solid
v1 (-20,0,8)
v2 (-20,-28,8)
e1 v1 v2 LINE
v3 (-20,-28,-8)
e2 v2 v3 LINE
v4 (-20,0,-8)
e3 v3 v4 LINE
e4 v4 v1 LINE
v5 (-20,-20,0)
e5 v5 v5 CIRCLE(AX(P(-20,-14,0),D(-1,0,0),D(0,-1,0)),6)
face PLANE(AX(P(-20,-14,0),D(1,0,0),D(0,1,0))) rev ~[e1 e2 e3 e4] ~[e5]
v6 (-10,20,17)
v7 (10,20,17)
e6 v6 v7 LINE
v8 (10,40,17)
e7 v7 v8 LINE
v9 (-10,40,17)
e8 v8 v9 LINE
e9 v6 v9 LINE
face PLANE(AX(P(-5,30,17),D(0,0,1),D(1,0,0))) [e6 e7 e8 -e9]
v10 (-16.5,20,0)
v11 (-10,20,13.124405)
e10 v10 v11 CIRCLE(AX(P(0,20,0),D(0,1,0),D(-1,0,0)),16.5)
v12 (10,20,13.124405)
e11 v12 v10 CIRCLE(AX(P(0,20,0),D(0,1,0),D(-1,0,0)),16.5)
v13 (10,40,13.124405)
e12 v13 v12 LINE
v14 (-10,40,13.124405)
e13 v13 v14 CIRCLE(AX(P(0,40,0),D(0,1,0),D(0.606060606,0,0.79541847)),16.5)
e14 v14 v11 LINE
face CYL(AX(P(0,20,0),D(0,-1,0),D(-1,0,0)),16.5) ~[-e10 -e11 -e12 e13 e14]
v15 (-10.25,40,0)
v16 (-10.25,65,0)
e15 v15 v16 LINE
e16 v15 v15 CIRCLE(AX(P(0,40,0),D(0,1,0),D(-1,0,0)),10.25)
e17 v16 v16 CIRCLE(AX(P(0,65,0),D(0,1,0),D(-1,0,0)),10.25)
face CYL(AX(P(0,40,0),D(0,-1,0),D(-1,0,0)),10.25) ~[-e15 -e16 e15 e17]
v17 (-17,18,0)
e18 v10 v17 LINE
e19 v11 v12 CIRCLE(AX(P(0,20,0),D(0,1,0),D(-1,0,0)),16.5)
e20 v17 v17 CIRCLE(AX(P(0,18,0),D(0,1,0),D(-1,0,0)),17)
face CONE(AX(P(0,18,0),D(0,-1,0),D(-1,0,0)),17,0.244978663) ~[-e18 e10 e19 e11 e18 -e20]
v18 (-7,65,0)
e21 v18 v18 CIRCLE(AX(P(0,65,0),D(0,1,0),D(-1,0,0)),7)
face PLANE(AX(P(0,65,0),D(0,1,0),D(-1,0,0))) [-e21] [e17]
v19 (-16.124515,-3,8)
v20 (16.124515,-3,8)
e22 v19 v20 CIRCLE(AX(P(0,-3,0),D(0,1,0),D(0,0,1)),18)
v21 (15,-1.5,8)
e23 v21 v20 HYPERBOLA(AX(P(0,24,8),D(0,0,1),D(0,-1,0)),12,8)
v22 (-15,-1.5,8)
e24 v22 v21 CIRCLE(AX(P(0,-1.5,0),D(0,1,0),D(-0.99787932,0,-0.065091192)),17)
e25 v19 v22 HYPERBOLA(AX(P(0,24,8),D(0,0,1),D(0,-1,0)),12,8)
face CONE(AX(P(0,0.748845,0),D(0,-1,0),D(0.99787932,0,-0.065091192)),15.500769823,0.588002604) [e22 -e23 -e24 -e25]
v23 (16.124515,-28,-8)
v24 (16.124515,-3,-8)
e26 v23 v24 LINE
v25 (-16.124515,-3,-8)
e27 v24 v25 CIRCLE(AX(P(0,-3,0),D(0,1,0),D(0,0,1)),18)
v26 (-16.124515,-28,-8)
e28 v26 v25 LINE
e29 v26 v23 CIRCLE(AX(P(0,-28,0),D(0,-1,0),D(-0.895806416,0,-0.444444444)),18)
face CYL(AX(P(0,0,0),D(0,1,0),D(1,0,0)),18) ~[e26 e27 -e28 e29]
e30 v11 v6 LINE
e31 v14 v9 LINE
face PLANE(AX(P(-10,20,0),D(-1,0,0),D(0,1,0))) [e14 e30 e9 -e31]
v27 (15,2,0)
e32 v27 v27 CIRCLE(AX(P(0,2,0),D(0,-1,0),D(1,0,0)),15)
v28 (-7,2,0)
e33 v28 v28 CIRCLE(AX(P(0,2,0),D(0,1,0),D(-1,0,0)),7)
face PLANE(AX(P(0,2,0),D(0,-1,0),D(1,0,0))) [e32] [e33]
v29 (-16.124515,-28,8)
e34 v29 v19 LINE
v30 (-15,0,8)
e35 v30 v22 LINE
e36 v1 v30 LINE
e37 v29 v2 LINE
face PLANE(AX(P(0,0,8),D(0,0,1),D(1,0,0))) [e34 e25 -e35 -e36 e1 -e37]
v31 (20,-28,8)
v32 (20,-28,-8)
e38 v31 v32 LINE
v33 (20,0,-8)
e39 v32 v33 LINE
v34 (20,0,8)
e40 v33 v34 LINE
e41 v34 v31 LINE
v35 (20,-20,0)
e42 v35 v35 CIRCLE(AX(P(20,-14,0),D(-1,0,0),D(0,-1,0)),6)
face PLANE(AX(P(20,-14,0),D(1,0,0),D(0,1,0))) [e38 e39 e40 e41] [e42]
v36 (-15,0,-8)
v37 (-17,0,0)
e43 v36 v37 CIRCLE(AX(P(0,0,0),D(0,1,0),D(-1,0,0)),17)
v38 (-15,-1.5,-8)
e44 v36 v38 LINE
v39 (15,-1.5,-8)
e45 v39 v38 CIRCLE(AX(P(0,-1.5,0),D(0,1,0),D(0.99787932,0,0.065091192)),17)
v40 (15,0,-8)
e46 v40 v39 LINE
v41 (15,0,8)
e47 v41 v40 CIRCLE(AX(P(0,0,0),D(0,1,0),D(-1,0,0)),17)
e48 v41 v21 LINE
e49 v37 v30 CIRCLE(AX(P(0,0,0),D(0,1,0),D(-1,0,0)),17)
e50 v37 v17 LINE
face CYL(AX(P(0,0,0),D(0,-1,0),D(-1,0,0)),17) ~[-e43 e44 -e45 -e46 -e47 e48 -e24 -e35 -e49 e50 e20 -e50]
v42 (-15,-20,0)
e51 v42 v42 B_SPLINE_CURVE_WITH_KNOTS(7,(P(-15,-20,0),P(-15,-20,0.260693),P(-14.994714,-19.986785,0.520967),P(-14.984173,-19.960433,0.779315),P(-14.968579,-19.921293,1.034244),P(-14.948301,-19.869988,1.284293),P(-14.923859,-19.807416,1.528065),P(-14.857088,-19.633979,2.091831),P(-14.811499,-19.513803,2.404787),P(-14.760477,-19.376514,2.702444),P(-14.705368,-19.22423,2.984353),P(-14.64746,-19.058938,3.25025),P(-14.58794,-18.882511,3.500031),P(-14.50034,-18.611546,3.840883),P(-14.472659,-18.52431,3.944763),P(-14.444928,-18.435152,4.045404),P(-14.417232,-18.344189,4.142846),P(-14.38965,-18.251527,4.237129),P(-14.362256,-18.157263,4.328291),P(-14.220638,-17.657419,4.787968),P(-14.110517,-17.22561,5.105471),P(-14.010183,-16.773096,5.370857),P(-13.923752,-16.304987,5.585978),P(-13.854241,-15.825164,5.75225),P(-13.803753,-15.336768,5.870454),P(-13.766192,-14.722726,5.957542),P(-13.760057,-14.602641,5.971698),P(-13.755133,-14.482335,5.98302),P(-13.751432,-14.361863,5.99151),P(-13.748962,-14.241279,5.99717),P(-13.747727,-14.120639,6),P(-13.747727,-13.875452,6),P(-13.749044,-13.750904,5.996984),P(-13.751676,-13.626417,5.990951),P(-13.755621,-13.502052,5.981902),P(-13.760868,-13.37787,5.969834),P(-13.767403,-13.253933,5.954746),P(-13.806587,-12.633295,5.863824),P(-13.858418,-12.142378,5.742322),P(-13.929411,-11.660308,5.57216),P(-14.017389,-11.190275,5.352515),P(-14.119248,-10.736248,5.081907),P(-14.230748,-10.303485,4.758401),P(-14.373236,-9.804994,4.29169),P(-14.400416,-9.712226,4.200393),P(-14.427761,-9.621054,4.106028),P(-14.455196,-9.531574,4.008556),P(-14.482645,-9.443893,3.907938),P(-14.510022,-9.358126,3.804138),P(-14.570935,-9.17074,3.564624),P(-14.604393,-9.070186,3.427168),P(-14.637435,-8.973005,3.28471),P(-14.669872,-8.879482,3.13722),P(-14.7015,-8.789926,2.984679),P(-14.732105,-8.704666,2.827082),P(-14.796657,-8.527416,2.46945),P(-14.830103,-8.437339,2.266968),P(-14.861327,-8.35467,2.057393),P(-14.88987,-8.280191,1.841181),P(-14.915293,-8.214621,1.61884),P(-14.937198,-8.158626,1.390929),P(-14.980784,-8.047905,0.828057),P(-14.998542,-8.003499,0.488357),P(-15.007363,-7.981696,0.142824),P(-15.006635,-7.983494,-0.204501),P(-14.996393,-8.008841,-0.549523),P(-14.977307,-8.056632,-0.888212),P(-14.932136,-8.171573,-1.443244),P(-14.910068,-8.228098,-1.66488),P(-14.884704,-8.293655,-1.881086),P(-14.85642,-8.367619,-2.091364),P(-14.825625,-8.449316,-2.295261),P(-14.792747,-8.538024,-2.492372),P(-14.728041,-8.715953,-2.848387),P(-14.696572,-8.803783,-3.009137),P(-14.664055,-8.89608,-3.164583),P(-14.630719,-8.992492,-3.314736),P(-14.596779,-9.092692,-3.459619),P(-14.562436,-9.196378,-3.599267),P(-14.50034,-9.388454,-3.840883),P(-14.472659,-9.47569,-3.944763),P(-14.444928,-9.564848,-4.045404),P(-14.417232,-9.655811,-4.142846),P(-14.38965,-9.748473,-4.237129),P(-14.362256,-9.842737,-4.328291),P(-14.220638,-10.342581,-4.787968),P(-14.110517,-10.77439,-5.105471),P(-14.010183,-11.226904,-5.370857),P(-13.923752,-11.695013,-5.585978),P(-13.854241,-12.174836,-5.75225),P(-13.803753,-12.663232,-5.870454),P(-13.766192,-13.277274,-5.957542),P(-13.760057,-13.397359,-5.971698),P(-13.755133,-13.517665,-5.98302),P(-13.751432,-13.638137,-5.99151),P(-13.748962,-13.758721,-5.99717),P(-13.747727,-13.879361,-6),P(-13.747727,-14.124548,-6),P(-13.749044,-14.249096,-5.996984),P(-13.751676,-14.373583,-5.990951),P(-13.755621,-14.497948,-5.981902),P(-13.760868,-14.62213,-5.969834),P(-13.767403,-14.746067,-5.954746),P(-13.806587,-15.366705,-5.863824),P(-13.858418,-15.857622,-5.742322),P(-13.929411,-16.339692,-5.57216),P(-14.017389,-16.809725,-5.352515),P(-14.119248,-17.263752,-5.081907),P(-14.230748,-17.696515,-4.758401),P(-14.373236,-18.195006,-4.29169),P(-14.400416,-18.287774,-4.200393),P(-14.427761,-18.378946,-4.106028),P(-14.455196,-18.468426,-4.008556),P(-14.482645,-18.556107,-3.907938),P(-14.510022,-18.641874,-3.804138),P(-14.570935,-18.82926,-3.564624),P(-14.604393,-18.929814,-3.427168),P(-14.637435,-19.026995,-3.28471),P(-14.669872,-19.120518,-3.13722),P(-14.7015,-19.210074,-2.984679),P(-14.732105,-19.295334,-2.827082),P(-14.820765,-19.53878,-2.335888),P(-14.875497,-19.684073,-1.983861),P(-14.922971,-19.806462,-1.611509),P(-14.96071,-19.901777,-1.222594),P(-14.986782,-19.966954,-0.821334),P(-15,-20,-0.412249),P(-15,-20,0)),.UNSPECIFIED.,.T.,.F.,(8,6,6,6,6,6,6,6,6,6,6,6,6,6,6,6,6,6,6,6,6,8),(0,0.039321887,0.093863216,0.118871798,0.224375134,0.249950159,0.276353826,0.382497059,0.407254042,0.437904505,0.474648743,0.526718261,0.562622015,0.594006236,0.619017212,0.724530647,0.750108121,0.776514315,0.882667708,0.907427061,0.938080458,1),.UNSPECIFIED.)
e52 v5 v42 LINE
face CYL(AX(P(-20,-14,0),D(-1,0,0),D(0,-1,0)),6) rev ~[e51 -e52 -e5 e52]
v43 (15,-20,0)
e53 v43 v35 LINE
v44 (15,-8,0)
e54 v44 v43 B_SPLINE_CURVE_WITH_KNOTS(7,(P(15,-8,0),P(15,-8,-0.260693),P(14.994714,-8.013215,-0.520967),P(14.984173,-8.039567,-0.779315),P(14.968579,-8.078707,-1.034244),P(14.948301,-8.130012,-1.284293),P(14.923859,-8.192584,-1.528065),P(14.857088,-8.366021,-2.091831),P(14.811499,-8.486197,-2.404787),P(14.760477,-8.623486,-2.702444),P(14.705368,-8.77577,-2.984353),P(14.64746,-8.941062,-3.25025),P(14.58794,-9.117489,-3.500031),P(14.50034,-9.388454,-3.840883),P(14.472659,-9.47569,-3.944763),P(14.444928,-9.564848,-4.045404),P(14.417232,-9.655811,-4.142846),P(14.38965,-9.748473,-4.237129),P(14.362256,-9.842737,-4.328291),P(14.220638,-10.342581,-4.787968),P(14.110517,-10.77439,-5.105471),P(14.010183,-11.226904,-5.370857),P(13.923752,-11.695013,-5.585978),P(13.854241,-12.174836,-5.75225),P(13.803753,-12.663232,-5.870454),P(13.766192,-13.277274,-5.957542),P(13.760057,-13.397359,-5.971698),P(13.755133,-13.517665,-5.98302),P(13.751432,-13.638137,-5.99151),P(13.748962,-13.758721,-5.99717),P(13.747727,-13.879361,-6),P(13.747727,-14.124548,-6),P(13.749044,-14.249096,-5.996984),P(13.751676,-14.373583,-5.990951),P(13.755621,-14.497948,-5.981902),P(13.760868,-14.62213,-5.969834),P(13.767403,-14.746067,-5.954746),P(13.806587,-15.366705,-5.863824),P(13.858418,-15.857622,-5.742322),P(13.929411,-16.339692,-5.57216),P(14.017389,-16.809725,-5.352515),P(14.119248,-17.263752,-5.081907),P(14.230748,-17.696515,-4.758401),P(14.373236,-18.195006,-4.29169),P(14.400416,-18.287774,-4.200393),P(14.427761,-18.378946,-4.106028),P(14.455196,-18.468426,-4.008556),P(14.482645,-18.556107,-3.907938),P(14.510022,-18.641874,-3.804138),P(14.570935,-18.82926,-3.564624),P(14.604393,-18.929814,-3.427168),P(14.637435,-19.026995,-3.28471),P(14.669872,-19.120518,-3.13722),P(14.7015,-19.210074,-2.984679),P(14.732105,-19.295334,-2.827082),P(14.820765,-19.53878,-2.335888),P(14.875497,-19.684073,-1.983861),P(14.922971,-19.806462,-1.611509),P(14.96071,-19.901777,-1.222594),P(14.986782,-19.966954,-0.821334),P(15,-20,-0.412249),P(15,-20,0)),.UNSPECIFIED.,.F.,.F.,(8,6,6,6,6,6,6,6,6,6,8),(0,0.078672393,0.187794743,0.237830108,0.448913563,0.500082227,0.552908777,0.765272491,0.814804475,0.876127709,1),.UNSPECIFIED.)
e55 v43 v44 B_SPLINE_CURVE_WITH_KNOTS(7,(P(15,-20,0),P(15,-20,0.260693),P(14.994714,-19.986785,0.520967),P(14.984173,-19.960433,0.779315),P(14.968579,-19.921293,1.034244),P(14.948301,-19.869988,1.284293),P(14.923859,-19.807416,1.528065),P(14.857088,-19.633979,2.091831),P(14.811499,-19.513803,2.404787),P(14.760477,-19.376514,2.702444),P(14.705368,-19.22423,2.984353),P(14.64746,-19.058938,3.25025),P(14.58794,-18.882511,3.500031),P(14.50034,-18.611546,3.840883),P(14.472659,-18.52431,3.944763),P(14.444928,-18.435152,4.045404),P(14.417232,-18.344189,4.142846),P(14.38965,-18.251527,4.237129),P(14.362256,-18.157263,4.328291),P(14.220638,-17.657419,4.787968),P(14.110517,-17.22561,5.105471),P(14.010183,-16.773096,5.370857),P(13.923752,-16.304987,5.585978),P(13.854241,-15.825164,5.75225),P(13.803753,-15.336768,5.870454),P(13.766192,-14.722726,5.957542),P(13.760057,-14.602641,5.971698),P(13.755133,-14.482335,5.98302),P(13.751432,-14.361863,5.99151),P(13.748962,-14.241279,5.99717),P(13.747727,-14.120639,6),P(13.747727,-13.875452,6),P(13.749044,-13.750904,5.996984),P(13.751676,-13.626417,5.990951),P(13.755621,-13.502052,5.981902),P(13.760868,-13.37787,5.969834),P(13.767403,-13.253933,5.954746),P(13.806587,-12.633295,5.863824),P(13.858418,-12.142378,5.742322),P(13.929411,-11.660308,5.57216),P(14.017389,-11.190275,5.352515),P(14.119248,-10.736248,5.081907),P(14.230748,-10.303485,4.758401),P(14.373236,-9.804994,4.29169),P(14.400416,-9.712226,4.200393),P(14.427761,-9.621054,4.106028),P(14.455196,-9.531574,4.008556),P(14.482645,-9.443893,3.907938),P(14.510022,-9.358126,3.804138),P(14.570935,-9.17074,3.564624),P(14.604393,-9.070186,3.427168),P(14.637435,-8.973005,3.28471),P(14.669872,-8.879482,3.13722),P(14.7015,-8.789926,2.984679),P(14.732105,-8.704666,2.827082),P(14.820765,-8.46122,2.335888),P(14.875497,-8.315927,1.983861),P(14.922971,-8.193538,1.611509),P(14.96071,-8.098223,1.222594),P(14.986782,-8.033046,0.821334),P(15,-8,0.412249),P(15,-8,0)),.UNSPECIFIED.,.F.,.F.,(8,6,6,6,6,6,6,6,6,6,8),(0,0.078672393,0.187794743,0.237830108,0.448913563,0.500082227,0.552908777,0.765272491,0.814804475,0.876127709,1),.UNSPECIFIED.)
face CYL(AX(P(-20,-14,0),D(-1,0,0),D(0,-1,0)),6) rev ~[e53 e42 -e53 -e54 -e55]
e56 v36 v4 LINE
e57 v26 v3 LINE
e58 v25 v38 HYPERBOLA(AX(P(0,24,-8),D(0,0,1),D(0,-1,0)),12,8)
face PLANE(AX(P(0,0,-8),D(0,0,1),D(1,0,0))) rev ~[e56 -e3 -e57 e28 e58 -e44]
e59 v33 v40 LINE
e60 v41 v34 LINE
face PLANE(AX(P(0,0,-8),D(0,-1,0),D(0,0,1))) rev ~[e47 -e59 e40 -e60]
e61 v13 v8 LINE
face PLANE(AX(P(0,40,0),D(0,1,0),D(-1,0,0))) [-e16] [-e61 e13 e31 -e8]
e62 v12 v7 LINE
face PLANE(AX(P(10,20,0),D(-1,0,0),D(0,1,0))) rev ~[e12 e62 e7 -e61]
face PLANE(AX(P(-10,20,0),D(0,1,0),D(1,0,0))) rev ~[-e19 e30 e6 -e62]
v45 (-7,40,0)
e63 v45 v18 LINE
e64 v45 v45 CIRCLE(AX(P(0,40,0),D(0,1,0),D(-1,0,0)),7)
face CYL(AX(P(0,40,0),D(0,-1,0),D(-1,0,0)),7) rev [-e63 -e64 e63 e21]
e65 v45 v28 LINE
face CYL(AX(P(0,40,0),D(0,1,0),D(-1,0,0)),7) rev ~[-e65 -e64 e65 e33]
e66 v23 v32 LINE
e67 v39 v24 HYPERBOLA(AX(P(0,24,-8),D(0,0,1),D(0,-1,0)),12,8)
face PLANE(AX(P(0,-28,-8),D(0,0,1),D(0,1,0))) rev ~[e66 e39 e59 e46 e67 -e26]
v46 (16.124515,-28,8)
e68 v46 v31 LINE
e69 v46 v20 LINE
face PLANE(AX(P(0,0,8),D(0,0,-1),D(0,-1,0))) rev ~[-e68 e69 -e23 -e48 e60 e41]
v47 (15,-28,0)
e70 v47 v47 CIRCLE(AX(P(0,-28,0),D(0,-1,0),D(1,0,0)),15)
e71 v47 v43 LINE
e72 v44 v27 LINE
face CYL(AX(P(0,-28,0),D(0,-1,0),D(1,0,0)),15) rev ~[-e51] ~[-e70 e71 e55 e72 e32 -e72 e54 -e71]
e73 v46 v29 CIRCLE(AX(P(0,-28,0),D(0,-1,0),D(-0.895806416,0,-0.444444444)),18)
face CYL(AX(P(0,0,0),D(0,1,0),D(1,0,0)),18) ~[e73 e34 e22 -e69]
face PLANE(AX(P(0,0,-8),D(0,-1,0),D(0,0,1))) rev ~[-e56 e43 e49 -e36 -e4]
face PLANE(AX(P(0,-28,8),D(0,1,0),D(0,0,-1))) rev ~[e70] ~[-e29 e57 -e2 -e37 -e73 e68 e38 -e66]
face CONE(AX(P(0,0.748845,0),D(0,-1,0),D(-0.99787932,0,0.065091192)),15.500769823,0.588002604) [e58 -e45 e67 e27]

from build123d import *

# Parameters (mm, degrees)
F0_R          = 18
F0_R_2        = 15
F1_DEPTH      = 28
F3_DEPTH      = 20
F4_DEPTH      = 20
F5_R          = 9
F6_DEPTH      = 25
F7_R          = 17
F7_R_2        = 6.5
F8_DEPTH      = 20
F9_SIZE2      = 2
F9_SIZE       = 0.5
F10_DEPTH     = 20
F11_W         = 10
F11_H         = 20
F12_DEPTH     = 17
F13_R         = 15
F14_DEPTH     = 30
F15_R         = 7
F16_DEPTH     = 200
F17_T4_ANGLE  = 187.4641783336
F17_S5_R      = 17
F17_T6_DEPTH  = 27
F17_T11_ANGLE = 187.4641783336
F17_S12_R     = 17
F17_T13_DEPTH = 27
F18_R         = 10.25
F18_R_2       = 7
F19_DEPTH     = 25
F20_R         = 6
F21_DEPTH     = 45


# Not quite as in the source:
# - a fillet or chamfer that OpenCascade refuses, or shapes differently, is made with other operations: its cross-section is extruded or revolved along the edge and cut away or added


with BuildPart() as f1:
    # F0 (on Front) → F1 (new body)
    with BuildSketch(Plane.XZ):
        Circle(F0_R)
        Circle(F0_R_2, mode=Mode.SUBTRACT)
    extrude(amount=F1_DEPTH)

    # F2 (on Right) → F3 (join)
    with BuildSketch(Plane.YZ):
        Polygon((0, -8), (0, 0), (0, 8), (-28, 8), (-28, -8), align=None)
    extrude(amount=-F3_DEPTH)

    # F4 (add): a face of the model
    f4_faces = [f1.faces().sort_by_distance(p)[0] for p in [
        (0, -14, 0),
    ]]
    extrude(f4_faces, amount=F4_DEPTH)

    # F5 (on face) → F6 (cut)
    with BuildSketch(Plane.XZ.offset(28)):
        Circle(F5_R)
    extrude(amount=-F6_DEPTH, mode=Mode.SUBTRACT)

    # F7 (on face) → F8 (join)
    with BuildSketch(Plane(origin=(0, 0, 0), x_dir=(-1, 0, 0), z_dir=(0, 1, 0))):
        Circle(F7_R)
        Circle(F7_R_2, mode=Mode.SUBTRACT)
    extrude(amount=F8_DEPTH)

    # F9
    f9_edges = [f1.edges().sort_by_distance(p)[0] for p in [
        (17, 20, 0),
    ]]
    f9_side = f1.faces().sort_by_distance((16.519167, 20, 0))[0]
    chamfer(f9_edges, length=F9_SIZE, length2=F9_SIZE2, reference=f9_side)

    # F10 (add): a face of the model
    f10_faces = [f1.faces().sort_by_distance(p)[0] for p in [
        (16.0333095244, 20, 0),
    ]]
    extrude(f10_faces, amount=F10_DEPTH)

    # F11 (on Top) → F12 (join)
    with BuildSketch(Plane.XY):
        with Locations((-5, 30)):
            Rectangle(F11_W, F11_H)
        with Locations((5, 30)):
            Rectangle(F11_W, F11_H)
    extrude(amount=F12_DEPTH)

    # F13 (on face) → F14 (cut)
    with BuildSketch(Plane.XZ.offset(28)):
        Circle(F13_R)
    extrude(amount=-F14_DEPTH, mode=Mode.SUBTRACT)

    # F15 (on face) → F16 (cut)
    with BuildSketch(Plane(origin=(0, 40, 0), x_dir=(-1, 0, 0), z_dir=(0, 1, 0))):
        Circle(F15_R)
        with BuildLine():
            Line((-6.5, 0), (6.5, 0))
            ThreePointArc((6.5, 0), (0, -6.5), (-6.5, 0))
        make_face(mode=Mode.SUBTRACT)
    extrude(amount=-F16_DEPTH, mode=Mode.SUBTRACT)

    # F17: chamfer of 3 x 2 on 2 edges, made by hand


with BuildPart() as f17_tool2:
    # F17_s3 → F17_t4 (revolve)
    with BuildSketch(Plane(origin=(0, 0, 0), x_dir=(0, 1, 0), z_dir=(0.0650911923, 0, 0.9978793197))):
        with BuildLine():
            Line((0.7488452649, 15.5007698234), (-3.7488452649, 18.4992301766))
            Line((-3.7488452649, 18.4992301766), (-3.7488452649, 18.9492301766))
            ThreePointArc((-3.7488452649, 18.9492301766), (-1.8744226325, 18.45), (0, 18.45))
            Line((0, 18.45), (0.45, 18))
            ThreePointArc((0.45, 18), (0.45, 16.7503849117), (1.1988452649, 15.5007698234))
            Line((1.1988452649, 15.5007698234), (0.7488452649, 15.5007698234))
        make_face()
    revolve(axis=Axis((0, 0, 0), (0, -1, 0)), revolution_arc=F17_T4_ANGLE)

    # F17_s5 → F17_t6 (cut, symmetric)
    with BuildSketch(Plane.XZ.offset(0.9)):
        Circle(F17_S5_R)
    extrude(amount=F17_T6_DEPTH, both=True, mode=Mode.SUBTRACT)

    split(bisect_by=Plane.XY.offset(-8), keep=Keep.BOTTOM)


with BuildPart() as f1_1:
    add(f1.part)

    # F17_t1: cut F17_tool2
    add(f17_tool2.part, mode=Mode.SUBTRACT)


with BuildPart() as f17_tool9:
    # F17_s10 → F17_t11 (revolve)
    with BuildSketch(Plane(origin=(0, 0, 0), x_dir=(0, 1, 0), z_dir=(-0.0650911923, 0, -0.9978793197))):
        with BuildLine():
            Line((0.7488452649, 15.5007698234), (-3.7488452649, 18.4992301766))
            Line((-3.7488452649, 18.4992301766), (-3.7488452649, 18.9492301766))
            ThreePointArc((-3.7488452649, 18.9492301766), (-1.8744226325, 18.45), (0, 18.45))
            Line((0, 18.45), (0.45, 18))
            ThreePointArc((0.45, 18), (0.45, 16.7503849117), (1.1988452649, 15.5007698234))
            Line((1.1988452649, 15.5007698234), (0.7488452649, 15.5007698234))
        make_face()
    revolve(axis=Axis((0, 0, 0), (0, -1, 0)), revolution_arc=F17_T11_ANGLE)

    # F17_s12 → F17_t13 (cut, symmetric)
    with BuildSketch(Plane.XZ.offset(0.9)):
        Circle(F17_S12_R)
    extrude(amount=F17_T13_DEPTH, both=True, mode=Mode.SUBTRACT)

    split(bisect_by=Plane.XY.offset(8), keep=Keep.TOP)


with BuildPart() as f1_2:
    add(f1_1.part)

    # F17_t8: cut F17_tool9
    add(f17_tool9.part, mode=Mode.SUBTRACT)

    # F18 (on face) → F19 (join)
    with BuildSketch(Plane(origin=(0, 40, 0), x_dir=(-1, 0, 0), z_dir=(0, 1, 0))):
        Circle(F18_R)
        Circle(F18_R_2, mode=Mode.SUBTRACT)
    extrude(amount=F19_DEPTH)

    # F20 (on face) → F21 (cut)
    with BuildSketch(Plane(origin=(-20, 0, 0), x_dir=(0, -1, 0), z_dir=(-1, 0, 0))):
        with Locations((14, 0)):
            Circle(F20_R)
    extrude(amount=-F21_DEPTH, mode=Mode.SUBTRACT)


solid = f1_2.part
